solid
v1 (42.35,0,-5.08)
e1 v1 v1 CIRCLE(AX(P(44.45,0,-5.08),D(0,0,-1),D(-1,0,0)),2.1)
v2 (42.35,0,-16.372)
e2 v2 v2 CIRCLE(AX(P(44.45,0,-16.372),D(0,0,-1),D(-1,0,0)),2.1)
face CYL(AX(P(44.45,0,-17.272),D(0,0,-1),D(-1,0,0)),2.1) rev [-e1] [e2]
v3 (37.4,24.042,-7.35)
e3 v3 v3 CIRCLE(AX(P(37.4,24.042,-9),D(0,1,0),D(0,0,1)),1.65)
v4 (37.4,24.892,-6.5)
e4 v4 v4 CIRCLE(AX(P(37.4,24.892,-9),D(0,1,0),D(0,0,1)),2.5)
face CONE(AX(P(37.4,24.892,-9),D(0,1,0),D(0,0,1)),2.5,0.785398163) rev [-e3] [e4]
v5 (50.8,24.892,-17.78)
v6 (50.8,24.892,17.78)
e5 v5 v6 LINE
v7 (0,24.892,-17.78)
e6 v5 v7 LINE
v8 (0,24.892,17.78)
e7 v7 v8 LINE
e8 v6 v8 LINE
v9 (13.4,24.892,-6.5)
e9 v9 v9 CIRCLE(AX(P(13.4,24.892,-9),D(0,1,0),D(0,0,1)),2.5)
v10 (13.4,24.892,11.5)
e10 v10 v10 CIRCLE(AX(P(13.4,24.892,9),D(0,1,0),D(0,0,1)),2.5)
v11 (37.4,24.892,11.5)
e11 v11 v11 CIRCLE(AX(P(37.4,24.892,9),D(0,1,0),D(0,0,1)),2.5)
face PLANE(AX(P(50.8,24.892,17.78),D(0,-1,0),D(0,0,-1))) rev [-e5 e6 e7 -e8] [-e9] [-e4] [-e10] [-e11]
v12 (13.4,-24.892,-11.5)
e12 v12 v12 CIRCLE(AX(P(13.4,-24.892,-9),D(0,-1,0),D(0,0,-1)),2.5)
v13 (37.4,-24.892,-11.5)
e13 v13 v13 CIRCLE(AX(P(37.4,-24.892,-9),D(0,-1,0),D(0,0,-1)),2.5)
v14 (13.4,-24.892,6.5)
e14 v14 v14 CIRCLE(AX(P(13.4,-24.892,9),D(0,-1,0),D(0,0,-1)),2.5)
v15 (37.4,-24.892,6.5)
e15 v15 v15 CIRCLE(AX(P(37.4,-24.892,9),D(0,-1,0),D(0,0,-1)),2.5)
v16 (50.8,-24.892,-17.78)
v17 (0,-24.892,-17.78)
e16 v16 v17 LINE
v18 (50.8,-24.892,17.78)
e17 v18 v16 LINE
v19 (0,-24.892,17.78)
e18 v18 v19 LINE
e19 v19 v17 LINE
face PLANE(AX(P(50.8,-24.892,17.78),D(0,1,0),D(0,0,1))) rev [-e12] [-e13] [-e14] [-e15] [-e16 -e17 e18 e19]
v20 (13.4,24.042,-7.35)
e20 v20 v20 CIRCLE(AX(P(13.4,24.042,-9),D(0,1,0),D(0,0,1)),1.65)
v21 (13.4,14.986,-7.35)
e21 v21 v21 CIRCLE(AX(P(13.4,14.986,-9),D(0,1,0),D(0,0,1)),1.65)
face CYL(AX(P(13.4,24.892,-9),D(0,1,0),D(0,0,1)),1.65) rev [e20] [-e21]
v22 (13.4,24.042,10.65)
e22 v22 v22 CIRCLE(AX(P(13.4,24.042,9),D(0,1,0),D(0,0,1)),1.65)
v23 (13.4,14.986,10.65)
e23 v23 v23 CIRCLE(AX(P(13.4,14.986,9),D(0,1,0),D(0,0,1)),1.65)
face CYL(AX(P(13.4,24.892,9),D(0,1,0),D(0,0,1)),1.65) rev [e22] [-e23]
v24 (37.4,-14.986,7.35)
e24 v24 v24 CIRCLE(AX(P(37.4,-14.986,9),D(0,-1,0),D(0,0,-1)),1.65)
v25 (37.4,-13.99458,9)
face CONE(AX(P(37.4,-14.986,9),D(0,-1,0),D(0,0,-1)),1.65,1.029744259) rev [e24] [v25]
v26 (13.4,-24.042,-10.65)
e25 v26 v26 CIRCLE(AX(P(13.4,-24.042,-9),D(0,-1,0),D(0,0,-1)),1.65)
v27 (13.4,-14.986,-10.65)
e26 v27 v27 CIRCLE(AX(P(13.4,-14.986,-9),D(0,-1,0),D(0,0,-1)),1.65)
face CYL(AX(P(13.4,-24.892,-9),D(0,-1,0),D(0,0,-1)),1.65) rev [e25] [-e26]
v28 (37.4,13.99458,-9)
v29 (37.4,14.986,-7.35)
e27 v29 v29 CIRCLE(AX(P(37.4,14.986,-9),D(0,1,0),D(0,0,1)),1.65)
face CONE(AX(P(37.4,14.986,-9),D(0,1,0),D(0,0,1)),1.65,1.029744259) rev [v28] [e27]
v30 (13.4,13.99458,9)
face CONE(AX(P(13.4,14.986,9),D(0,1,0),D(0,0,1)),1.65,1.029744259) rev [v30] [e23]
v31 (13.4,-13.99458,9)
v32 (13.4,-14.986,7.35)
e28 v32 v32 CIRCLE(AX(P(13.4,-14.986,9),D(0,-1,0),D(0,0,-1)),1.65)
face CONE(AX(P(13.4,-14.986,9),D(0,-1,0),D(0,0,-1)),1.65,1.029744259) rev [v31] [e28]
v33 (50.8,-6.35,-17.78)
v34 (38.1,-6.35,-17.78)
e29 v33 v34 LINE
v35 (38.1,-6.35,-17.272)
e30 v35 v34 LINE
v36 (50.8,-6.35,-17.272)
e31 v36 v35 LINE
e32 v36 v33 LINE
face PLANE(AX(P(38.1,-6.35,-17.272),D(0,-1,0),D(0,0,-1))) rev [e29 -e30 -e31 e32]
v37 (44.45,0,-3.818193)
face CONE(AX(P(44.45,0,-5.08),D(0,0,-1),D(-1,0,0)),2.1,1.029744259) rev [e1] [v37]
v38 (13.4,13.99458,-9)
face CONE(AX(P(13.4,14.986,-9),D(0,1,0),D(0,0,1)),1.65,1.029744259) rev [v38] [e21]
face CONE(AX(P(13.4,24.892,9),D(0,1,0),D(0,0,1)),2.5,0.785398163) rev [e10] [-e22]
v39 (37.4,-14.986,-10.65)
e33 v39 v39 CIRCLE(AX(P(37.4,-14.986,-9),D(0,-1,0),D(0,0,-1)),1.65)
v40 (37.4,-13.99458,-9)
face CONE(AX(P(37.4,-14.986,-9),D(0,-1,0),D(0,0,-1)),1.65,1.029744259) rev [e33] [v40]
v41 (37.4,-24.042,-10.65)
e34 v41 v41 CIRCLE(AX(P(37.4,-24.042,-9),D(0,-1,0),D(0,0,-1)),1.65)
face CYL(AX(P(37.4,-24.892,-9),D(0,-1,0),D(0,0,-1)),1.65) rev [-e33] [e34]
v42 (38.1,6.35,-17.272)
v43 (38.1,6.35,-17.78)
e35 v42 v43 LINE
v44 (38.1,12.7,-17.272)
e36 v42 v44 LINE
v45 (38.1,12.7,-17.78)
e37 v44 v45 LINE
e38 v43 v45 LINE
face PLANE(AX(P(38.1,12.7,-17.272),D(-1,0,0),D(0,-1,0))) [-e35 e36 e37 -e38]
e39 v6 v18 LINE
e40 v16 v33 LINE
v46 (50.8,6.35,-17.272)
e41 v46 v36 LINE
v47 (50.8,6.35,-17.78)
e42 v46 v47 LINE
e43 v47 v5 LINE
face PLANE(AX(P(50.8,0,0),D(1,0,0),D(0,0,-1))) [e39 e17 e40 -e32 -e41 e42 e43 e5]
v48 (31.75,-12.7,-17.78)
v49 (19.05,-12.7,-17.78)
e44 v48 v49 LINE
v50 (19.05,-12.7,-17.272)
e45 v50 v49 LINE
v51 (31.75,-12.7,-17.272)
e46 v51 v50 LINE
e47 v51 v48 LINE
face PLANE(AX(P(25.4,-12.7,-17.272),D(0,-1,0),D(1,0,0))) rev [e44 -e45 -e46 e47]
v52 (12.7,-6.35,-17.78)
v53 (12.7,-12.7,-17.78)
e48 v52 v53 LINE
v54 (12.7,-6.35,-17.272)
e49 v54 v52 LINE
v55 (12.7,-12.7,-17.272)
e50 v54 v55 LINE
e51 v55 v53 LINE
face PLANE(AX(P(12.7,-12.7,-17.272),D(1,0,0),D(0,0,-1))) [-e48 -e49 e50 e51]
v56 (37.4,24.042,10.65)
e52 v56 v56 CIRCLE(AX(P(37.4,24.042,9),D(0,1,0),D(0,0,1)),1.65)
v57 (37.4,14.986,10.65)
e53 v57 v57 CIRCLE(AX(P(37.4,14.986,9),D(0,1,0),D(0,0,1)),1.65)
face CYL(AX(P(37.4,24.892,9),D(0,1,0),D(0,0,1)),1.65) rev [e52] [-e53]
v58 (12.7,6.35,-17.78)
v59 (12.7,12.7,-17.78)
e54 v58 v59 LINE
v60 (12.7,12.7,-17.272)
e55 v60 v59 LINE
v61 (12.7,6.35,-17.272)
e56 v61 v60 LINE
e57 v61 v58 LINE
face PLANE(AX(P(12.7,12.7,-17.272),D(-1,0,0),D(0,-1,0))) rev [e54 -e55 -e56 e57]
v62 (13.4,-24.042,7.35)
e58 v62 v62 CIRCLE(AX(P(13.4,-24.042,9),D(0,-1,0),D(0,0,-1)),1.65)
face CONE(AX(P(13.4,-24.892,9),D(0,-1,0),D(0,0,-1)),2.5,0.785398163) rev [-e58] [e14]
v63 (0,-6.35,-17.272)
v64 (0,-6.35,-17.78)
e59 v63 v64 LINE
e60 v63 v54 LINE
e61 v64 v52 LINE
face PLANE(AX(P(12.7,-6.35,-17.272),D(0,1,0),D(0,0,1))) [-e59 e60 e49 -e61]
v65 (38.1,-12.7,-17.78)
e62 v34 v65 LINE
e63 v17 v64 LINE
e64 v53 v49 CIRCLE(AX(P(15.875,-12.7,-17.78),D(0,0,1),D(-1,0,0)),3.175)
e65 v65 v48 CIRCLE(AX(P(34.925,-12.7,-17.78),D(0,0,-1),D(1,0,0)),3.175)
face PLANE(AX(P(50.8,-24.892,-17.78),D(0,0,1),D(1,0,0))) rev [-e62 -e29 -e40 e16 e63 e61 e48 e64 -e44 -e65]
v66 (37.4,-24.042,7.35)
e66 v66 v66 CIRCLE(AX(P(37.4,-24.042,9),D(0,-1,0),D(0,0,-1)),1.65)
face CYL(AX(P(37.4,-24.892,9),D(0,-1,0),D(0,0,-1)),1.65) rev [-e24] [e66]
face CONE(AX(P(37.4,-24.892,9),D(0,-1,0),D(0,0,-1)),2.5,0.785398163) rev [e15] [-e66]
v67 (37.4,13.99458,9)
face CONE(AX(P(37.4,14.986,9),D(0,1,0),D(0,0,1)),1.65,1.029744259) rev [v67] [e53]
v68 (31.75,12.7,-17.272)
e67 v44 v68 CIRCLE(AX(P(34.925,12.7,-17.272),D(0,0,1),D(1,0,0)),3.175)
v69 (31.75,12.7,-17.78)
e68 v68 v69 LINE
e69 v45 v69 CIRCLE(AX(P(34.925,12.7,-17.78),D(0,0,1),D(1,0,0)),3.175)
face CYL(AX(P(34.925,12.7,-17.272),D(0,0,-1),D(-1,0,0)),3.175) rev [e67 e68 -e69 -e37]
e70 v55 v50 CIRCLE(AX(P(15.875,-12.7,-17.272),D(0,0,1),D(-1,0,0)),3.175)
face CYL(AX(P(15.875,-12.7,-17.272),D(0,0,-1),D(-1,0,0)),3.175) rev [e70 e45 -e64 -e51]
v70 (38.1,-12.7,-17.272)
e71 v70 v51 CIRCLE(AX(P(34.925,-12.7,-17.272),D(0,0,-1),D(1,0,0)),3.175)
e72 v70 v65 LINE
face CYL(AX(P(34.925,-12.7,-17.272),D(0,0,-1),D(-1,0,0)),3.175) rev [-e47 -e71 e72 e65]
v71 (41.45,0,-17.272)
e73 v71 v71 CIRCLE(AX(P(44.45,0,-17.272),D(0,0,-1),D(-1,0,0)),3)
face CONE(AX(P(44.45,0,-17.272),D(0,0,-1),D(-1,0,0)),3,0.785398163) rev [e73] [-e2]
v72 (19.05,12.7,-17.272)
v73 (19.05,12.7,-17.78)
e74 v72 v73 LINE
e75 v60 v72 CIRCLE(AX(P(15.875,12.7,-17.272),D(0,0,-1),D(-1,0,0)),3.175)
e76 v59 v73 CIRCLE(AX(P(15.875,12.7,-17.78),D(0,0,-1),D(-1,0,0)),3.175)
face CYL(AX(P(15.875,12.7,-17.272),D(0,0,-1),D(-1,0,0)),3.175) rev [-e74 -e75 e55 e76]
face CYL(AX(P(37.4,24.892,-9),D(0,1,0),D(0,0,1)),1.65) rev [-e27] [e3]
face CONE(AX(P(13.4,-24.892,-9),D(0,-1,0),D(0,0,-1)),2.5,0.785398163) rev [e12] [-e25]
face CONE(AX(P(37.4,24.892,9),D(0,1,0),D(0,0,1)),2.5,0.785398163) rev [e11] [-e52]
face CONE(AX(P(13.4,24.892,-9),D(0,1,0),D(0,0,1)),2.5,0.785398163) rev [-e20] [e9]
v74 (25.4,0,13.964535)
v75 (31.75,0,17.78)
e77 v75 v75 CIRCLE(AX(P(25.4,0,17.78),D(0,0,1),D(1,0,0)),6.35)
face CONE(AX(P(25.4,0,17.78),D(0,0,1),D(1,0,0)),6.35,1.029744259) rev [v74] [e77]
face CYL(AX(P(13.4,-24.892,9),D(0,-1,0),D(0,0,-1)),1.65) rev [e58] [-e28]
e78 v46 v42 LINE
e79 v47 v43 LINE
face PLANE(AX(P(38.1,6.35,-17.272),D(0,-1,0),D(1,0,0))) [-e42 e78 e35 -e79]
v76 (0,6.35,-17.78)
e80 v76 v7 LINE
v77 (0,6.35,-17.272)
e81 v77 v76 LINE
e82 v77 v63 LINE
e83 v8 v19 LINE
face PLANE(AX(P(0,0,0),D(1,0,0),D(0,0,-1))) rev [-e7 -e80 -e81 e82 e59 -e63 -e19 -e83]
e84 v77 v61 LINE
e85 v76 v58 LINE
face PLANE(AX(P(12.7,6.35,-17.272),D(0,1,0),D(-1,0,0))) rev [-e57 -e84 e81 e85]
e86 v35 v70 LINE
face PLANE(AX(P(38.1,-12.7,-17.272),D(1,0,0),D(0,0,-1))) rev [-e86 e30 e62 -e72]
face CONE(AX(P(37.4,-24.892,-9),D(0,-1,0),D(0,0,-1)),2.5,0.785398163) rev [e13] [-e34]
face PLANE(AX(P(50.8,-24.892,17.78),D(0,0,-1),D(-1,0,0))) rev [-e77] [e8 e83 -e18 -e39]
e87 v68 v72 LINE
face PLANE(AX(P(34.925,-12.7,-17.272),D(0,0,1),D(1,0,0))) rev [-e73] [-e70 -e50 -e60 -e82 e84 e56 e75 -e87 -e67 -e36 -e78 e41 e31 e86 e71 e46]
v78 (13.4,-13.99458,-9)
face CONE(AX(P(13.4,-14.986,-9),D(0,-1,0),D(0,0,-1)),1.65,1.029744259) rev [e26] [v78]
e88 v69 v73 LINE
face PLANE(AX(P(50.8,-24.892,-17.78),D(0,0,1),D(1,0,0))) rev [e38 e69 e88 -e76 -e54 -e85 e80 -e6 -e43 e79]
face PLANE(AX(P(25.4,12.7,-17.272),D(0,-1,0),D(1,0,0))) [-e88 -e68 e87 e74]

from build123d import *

# Parameters (mm, degrees)
SKETCH1_W                       = 49.784
SKETCH1_H                       = 35.56
BOSS_EXTRUDE1_DEPTH             = 50.8
M4X0_7_TAPPED_HOLE1_AT_2_COUNT  = 2
M4X0_7_TAPPED_HOLE1_AT_2_PITCH  = 30
M4X0_7_TAPPED_HOLE1_AT_3_COUNT  = 2
M4X0_7_TAPPED_HOLE1_AT_3_PITCH  = 18
M4X0_7_TAPPED_HOLE1_AT_4_COUNT  = 2
M4X0_7_TAPPED_HOLE1_AT_4_PITCH  = 24
CUT_EXTRUDE2_DEPTH              = 0.508
MIRROR2_START                   = -17.78
MIRROR2_DEPTH                   = 0.508
M5X0_8_TAPPED_HOLE1_D           = 4.2
M5X0_8_TAPPED_HOLE1_DEPTH       = 12.192
M5X0_8_TAPPED_HOLE1_CSINK_D     = 6
M5X0_8_TAPPED_HOLE1_CSINK_ANGLE = 90
M5X0_8_TAPPED_HOLE1_TIP         = 1.2618073


# Read off the part's stored shape, not the designer's step: Mirror2
with BuildPart() as part:
    # Sketch1 → Boss-Extrude1 (new body)
    with BuildSketch(Plane.YZ):
        Rectangle(SKETCH1_W, SKETCH1_H)
    extrude(amount=BOSS_EXTRUDE1_DEPTH)

    # Sketch3 → M4x0.7 Tapped Hole1 (revolve, cut)
    with BuildSketch(Plane(origin=(13.4, -24.892, -9), x_dir=(0, 0, -1), z_dir=(1, 0, 0))):
        Polygon((0, 0), (0, 10.897420021), (1.65, 9.906), (1.65, 0.85), (2.5, 0), align=None)
    m4x0_7_tapped_hole1 = revolve(axis=Axis((13.4, -31.242, -9), (0, 1, 0)), mode=Mode.SUBTRACT)

    # M4x0.7 Tapped Hole1 at 2: M4x0.7 Tapped Hole1 ×2
    with Locations(*[Vector(0.8000000000000002, 0, 0.5999999999999998) * (i * M4X0_7_TAPPED_HOLE1_AT_2_PITCH) for i in range(1, M4X0_7_TAPPED_HOLE1_AT_2_COUNT)]):
        add(m4x0_7_tapped_hole1, mode=Mode.SUBTRACT)

    # M4x0.7 Tapped Hole1 at 3: M4x0.7 Tapped Hole1 ×2
    with Locations(*[(0, 0, i * M4X0_7_TAPPED_HOLE1_AT_3_PITCH) for i in range(1, M4X0_7_TAPPED_HOLE1_AT_3_COUNT)]):
        add(m4x0_7_tapped_hole1, mode=Mode.SUBTRACT)

    # M4x0.7 Tapped Hole1 at 4: M4x0.7 Tapped Hole1 ×2
    with Locations(*[(i * M4X0_7_TAPPED_HOLE1_AT_4_PITCH, 0, 0) for i in range(1, M4X0_7_TAPPED_HOLE1_AT_4_COUNT)]):
        add(m4x0_7_tapped_hole1, mode=Mode.SUBTRACT)

    # Mirror1: M4x0.7 Tapped Hole1 across plane
    add(m4x0_7_tapped_hole1.mirror(Plane.ZX), mode=Mode.SUBTRACT)

    # Mirror1 copy 1 sketch → Mirror1 copy 1 (revolve, cut)
    with BuildSketch(Plane(origin=(37.4, 24.892, 9), x_dir=(0, 0, -1), z_dir=(1, 0, 0))):
        Polygon((0, 0), (0, -10.897420021), (1.65, -9.906), (1.65, -0.85), (2.5, 0), align=None)
    revolve(axis=Axis((37.4, 31.242, 9), (0, 1, 0)), mode=Mode.SUBTRACT)

    # Mirror1 copy 2 sketch → Mirror1 copy 2 (revolve, cut)
    with BuildSketch(Plane(origin=(13.4, 24.892, 9), x_dir=(0, 0, -1), z_dir=(1, 0, 0))):
        Polygon((0, 0), (0, -10.897420021), (1.65, -9.906), (1.65, -0.85), (2.5, 0), align=None)
    revolve(axis=Axis((13.4, 31.242, 9), (0, 1, 0)), mode=Mode.SUBTRACT)

    # Mirror1 copy 3 sketch → Mirror1 copy 3 (revolve, cut)
    with BuildSketch(Plane(origin=(37.4, 24.892, -9), x_dir=(0, 0, -1), z_dir=(1, 0, 0))):
        Polygon((0, 0), (0, -10.897420021), (1.65, -9.906), (1.65, -0.85), (2.5, 0), align=None)
    revolve(axis=Axis((37.4, 31.242, -9), (0, 1, 0)), mode=Mode.SUBTRACT)

    # Sketch5 → Cut-Revolve1 (revolve, cut)
    with BuildSketch(Plane(origin=(0, 0, 0), x_dir=(-1, 0, 0), z_dir=(0, 1, 0))):
        Polygon((-25.4, 17.78), (-25.4, 13.964535069), (-31.75, 17.78), align=None)
    revolve(axis=Axis((25.4, 0, 17.78), (0, 0, -1)), mode=Mode.SUBTRACT)

    # Sketch9 → Cut-Extrude2 (cut)
    with BuildSketch(Plane(origin=(0, 0, -17.78), x_dir=(1, 0, 0), z_dir=(0, 0, -1))):
        with BuildLine():
            Line((25.4, 12.7), (31.75, 12.7))
            ThreePointArc((31.75, 12.7), (34.925, 15.875), (38.1, 12.7))
            Line((38.1, 12.7), (38.1, 6.35))
            Line((38.1, 6.35), (50.8, 6.35))
            Line((50.8, 6.35), (50.8, 0))
            Line((50.8, 0), (25.4, 0))
            Line((25.4, 0), (25.4, 12.7))
        make_face()
    extrude(amount=-CUT_EXTRUDE2_DEPTH, mode=Mode.SUBTRACT)

    # Mirror2 outline → Mirror2 (cut)
    with BuildSketch(Plane.XY.offset(MIRROR2_START)):
        with BuildLine():
            Line((38.1, 6.35), (38.1, 12.7))
            ThreePointArc((38.1, 12.7), (34.925, 15.875), (31.75, 12.7))
            Line((31.75, 12.7), (19.05, 12.7))
            ThreePointArc((19.05, 12.7), (15.875, 15.875), (12.7, 12.7))
            Line((12.7, 12.7), (12.7, 6.35))
            Line((12.7, 6.35), (0, 6.35))
            Line((0, 6.35), (0, -6.35))
            Line((0, -6.35), (12.7, -6.35))
            Line((12.7, -6.35), (12.7, -12.7))
            ThreePointArc((12.7, -12.7), (15.875, -15.875), (19.05, -12.7))
            Line((19.05, -12.7), (25.4, -12.7))
            Line((25.4, -12.7), (25.4, 0))
            Line((25.4, 0), (50.8, 0))
            Line((50.8, 0), (50.8, 6.35))
            Line((50.8, 6.35), (38.1, 6.35))
        make_face()
    extrude(amount=MIRROR2_DEPTH, mode=Mode.SUBTRACT)

    # M5x0.8 Tapped Hole1
    with Locations(Plane(origin=(0, 0, -17.272), x_dir=(1, 0, 0), z_dir=(0, 0, -1))):
        with Locations((44.45, 0)):
            CounterSinkHole(M5X0_8_TAPPED_HOLE1_D / 2, M5X0_8_TAPPED_HOLE1_CSINK_D / 2, depth=M5X0_8_TAPPED_HOLE1_DEPTH, counter_sink_angle=M5X0_8_TAPPED_HOLE1_CSINK_ANGLE)
            with Locations((0, 0, -(M5X0_8_TAPPED_HOLE1_DEPTH + M5X0_8_TAPPED_HOLE1_TIP / 2))):  # 118° drill point
                Cone(0, M5X0_8_TAPPED_HOLE1_D / 2, M5X0_8_TAPPED_HOLE1_TIP, mode=Mode.SUBTRACT)


solid = part.part
